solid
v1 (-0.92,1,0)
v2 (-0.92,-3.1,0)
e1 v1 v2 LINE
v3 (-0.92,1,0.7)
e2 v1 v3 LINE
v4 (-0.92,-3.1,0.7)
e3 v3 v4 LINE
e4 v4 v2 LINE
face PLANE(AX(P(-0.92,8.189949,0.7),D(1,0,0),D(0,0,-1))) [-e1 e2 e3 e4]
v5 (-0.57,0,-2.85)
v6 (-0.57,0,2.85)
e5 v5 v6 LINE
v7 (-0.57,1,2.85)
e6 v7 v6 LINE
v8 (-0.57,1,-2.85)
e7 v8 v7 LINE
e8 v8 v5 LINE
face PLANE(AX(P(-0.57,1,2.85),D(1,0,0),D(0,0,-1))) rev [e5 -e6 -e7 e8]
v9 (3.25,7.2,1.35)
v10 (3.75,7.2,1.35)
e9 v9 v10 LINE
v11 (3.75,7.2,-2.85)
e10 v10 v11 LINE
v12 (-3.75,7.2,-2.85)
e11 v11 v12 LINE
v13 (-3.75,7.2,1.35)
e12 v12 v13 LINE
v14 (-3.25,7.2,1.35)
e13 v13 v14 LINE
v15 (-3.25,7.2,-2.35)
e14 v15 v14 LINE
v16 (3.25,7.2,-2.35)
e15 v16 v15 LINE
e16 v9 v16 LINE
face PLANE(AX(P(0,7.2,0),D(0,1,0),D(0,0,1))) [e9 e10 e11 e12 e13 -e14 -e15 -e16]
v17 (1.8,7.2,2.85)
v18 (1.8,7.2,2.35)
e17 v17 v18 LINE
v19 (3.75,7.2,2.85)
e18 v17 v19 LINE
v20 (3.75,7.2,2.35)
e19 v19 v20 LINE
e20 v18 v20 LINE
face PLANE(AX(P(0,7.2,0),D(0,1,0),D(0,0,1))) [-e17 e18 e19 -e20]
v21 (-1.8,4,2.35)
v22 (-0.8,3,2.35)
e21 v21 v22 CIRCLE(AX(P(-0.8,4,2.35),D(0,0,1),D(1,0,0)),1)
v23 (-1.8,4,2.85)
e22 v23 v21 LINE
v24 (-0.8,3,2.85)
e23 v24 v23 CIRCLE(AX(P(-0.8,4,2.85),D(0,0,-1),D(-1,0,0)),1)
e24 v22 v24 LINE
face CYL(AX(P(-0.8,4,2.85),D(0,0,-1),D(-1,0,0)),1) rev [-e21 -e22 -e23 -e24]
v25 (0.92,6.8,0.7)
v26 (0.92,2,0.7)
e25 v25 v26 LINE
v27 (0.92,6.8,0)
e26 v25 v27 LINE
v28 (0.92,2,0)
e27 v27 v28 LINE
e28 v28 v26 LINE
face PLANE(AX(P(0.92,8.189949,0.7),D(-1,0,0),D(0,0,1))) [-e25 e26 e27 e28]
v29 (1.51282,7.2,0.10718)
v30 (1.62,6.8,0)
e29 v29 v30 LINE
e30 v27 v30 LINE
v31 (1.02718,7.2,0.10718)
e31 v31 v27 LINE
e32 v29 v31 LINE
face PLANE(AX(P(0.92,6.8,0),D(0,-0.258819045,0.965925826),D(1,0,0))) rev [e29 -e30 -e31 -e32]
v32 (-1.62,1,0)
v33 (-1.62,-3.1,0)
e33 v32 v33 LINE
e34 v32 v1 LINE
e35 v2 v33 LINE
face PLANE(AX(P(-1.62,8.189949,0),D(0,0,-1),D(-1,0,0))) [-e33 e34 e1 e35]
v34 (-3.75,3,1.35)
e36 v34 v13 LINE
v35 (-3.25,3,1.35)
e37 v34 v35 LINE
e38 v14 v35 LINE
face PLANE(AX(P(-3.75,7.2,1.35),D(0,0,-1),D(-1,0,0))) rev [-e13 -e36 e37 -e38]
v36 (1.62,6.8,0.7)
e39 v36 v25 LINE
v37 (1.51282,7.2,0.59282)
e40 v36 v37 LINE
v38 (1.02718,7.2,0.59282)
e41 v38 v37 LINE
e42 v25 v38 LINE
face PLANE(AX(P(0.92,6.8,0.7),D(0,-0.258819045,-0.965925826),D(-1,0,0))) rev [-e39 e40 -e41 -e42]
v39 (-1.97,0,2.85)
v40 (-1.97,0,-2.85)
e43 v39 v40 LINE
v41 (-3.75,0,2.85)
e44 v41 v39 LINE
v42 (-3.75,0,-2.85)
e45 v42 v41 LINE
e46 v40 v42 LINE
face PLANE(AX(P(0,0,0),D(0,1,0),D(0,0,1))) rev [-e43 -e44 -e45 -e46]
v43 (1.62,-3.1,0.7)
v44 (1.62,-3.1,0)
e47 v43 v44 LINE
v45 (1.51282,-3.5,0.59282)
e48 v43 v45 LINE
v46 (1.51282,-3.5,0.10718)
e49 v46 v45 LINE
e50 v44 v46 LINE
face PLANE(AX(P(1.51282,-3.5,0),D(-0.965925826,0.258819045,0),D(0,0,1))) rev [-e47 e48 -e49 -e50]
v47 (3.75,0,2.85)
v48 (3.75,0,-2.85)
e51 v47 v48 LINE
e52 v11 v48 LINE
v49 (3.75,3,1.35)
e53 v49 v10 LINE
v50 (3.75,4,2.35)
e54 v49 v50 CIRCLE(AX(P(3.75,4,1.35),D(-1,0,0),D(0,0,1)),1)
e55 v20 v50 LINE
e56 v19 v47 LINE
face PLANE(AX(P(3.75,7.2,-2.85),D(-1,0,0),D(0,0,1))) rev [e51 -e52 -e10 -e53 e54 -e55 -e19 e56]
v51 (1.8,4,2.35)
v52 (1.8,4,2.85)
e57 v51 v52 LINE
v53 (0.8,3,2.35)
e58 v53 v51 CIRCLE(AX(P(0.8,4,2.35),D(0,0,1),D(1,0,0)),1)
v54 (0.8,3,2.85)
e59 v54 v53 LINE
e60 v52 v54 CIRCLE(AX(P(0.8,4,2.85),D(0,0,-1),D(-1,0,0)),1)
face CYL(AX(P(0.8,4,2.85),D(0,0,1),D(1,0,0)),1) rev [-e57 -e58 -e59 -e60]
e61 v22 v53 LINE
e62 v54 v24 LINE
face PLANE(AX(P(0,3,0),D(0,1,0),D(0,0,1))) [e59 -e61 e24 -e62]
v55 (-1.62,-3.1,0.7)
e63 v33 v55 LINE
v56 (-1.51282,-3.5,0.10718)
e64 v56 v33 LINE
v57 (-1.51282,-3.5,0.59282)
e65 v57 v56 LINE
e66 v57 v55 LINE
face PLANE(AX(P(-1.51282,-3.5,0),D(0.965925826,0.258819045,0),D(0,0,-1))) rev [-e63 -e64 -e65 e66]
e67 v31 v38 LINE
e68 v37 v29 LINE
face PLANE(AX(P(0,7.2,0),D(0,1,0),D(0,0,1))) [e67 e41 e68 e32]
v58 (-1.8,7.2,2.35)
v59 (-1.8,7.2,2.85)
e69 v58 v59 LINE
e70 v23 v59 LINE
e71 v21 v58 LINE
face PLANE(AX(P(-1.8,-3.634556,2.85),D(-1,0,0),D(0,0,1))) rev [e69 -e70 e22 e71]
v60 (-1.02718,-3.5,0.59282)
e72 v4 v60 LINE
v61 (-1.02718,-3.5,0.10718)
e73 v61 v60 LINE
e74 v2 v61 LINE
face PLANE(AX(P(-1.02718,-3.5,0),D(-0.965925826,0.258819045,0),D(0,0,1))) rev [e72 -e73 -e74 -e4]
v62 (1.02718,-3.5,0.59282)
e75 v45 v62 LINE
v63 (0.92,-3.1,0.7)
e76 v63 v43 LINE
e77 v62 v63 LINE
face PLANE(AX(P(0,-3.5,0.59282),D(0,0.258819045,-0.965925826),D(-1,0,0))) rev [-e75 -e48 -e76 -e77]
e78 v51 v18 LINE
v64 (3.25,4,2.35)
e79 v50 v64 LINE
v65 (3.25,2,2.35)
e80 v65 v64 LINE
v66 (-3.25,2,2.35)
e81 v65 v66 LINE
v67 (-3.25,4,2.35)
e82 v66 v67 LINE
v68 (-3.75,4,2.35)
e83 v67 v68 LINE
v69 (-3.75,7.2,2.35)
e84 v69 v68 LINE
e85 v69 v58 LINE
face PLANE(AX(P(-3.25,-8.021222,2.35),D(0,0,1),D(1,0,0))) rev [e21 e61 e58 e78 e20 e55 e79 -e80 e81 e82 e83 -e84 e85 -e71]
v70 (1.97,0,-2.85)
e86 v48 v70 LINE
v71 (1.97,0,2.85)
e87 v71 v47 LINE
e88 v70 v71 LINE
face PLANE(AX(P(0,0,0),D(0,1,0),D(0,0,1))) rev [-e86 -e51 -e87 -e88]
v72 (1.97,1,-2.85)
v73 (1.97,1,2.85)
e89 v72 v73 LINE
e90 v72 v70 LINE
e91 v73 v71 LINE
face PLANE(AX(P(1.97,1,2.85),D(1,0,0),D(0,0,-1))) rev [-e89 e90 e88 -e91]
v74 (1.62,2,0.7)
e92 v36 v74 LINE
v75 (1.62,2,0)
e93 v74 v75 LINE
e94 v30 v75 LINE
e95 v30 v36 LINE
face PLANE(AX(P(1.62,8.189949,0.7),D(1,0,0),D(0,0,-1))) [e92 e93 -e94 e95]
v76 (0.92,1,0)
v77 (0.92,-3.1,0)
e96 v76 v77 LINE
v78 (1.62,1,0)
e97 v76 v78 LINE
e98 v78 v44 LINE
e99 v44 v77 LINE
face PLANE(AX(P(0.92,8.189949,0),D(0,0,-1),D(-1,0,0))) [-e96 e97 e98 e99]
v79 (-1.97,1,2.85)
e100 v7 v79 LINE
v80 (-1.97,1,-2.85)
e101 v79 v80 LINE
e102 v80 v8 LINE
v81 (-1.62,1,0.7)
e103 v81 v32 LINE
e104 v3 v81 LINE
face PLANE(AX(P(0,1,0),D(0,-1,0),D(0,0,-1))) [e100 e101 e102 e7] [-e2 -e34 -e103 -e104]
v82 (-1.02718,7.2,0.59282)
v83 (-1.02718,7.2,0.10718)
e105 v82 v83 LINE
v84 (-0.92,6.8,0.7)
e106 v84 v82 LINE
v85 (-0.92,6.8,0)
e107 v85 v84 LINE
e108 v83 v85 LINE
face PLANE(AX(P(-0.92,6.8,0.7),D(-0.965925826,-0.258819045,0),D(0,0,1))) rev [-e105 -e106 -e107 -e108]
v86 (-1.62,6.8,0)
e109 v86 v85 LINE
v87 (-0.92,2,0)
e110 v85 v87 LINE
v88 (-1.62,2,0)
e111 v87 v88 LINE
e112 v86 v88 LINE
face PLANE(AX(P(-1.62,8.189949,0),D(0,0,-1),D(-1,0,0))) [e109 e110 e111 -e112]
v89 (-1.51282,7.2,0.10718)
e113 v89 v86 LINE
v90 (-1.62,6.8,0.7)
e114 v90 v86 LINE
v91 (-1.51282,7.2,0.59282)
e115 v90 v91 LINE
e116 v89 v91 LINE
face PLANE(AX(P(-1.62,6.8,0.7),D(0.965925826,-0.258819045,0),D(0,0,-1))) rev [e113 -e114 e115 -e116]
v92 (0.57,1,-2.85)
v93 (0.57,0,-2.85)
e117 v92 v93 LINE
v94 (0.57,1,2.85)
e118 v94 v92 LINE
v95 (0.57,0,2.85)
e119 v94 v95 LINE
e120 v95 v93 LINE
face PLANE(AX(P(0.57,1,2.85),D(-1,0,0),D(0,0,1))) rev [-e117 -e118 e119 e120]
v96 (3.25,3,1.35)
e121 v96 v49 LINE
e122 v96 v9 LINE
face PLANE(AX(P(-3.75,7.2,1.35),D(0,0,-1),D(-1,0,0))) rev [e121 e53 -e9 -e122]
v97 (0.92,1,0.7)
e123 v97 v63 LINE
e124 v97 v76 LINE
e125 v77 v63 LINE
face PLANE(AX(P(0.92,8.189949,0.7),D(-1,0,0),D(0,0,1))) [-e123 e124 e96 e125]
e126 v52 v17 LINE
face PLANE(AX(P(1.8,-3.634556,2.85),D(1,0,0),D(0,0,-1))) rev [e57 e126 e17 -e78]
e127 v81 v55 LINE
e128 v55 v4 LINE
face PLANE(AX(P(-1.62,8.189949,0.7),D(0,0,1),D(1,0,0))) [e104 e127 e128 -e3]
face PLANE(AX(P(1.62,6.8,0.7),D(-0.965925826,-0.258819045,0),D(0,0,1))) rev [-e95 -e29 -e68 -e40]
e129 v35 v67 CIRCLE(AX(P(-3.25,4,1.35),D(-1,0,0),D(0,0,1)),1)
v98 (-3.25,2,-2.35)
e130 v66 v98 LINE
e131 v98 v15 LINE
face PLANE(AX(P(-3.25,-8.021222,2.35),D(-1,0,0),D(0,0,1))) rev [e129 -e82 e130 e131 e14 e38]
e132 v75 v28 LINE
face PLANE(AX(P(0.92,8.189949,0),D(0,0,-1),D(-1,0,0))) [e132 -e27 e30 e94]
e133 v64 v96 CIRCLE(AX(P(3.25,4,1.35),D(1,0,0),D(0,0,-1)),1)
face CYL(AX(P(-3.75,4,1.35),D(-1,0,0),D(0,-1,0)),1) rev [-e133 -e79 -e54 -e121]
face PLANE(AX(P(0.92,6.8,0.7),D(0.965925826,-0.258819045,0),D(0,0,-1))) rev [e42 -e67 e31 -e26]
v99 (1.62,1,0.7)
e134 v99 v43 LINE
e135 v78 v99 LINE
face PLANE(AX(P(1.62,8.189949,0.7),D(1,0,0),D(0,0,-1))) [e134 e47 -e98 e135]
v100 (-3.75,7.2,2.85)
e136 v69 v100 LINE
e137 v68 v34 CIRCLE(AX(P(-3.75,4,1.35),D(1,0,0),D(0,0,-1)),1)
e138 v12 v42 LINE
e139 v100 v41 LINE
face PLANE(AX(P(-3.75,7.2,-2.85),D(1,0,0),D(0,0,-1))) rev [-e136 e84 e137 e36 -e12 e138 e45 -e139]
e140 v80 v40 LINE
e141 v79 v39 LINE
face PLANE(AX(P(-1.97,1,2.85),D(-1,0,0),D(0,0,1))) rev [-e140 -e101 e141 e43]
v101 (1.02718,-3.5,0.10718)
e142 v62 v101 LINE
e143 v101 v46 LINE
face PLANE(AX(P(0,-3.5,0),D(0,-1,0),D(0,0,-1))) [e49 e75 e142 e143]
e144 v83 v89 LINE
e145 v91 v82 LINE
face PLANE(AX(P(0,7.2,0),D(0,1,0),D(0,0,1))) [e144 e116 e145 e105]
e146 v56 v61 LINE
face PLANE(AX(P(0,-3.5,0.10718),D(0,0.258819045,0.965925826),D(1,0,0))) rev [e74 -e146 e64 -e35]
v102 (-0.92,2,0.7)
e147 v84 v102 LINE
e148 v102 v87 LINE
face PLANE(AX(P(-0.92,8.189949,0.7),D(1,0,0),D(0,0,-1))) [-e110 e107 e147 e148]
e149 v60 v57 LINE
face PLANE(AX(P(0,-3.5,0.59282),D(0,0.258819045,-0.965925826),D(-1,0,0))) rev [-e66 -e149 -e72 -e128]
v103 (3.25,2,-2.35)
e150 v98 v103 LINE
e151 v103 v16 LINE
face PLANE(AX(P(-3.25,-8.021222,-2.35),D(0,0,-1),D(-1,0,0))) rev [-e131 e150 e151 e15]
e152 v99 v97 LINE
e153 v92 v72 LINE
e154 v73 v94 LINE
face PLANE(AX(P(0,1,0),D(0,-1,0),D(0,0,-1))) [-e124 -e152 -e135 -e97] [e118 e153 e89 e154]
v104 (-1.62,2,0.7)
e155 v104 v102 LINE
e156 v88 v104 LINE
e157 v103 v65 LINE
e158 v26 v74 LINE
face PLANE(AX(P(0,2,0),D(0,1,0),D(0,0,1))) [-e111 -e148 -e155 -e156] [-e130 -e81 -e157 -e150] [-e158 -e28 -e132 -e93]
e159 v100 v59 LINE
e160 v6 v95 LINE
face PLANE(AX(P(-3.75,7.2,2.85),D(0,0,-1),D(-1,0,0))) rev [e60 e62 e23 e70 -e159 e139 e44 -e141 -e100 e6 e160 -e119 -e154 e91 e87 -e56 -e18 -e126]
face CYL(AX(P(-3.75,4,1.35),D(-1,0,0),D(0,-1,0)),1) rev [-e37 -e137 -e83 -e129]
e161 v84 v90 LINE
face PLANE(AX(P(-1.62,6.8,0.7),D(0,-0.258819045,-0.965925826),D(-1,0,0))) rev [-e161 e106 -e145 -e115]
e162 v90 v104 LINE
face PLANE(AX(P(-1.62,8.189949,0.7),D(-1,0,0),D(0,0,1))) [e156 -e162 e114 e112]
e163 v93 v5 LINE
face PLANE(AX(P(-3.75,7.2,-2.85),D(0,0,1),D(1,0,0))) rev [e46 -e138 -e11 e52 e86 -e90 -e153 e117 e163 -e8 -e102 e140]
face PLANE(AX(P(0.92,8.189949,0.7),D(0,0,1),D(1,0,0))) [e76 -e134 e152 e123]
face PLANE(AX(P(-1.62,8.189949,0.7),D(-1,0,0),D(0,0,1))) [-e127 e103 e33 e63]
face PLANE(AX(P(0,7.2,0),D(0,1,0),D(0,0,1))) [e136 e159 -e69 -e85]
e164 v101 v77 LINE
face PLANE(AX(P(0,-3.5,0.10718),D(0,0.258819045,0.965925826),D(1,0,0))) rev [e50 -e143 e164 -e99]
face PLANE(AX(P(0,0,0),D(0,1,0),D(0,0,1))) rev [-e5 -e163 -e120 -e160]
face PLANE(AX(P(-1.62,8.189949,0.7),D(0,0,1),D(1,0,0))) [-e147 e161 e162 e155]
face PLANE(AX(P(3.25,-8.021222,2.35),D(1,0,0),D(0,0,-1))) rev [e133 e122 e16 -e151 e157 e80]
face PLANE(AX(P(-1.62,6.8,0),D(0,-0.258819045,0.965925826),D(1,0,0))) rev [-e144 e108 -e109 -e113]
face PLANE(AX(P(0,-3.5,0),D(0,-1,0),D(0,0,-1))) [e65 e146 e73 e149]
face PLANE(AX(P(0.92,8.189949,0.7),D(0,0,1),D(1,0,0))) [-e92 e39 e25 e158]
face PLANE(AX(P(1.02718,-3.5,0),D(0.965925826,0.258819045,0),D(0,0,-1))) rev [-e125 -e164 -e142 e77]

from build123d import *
from OCP.BRepFilletAPI import BRepFilletAPI_MakeChamfer

# Parameters (mm, degrees)
CROQUIS2_W              = 7.5
CROQUIS2_H              = 5.7
SALIENTE_EXTRUIR1_DEPTH = 7.2
CROQUIS3_W              = 6.5
CROQUIS3_H              = 4.7
CORTAR_EXTRUIR1_DEPTH   = 5.2
CROQUIS4_W              = 3.6
CROQUIS4_H              = 0.5
CORTAR_EXTRUIR2_DEPTH   = 4.2
CROQUIS5_W              = 1
CROQUIS5_H              = 4.2
CORTAR_EXTRUIR3_DEPTH   = 11.780190165
REDONDEO1_R             = 1
CROQUIS7_W              = 1.4
CROQUIS7_H              = 5.7
CORTAR_EXTRUIR4_DEPTH   = 1
SALIENTE_EXTRUIR2_START = -7.2
CROQUIS6_W              = 0.7
CROQUIS6_H              = 0.7
SALIENTE_EXTRUIR2_DEPTH = 10.7
CHAFL_N1_SIZE           = 0.4
CHAFL_N1_SIZE2          = 0.107179677
CHAFL_N2_SIZE           = 0.4
CHAFL_N2_SIZE2          = 0.107179677
CHAFL_N3_SIZE           = 0.4
CHAFL_N3_SIZE2          = 0.107179677


with BuildPart() as part:
    # Croquis2 → Saliente-Extruir1 (new body)
    with BuildSketch(Plane(origin=(0, 0, 0), x_dir=(1, 0, 0), z_dir=(0, 1, 0))):
        Rectangle(CROQUIS2_W, CROQUIS2_H)
    extrude(amount=SALIENTE_EXTRUIR1_DEPTH)

    # Croquis3 → Cortar-Extruir1 (cut)
    with BuildSketch(Plane(origin=(0, 7.2, 0), x_dir=(1, 0, 0), z_dir=(0, 1, 0))):
        Rectangle(CROQUIS3_W, CROQUIS3_H)
    extrude(amount=-CORTAR_EXTRUIR1_DEPTH, mode=Mode.SUBTRACT)

    # Croquis4 → Cortar-Extruir2 (cut)
    with BuildSketch(Plane(origin=(0, 7.2, 0), x_dir=(1, 0, 0), z_dir=(0, 1, 0))):
        with Locations((0, -2.6)):
            Rectangle(CROQUIS4_W, CROQUIS4_H)
    extrude(amount=-CORTAR_EXTRUIR2_DEPTH, mode=Mode.SUBTRACT)

    # Croquis5 → Cortar-Extruir3 (cut, through all)
    with BuildSketch(Plane(origin=(3.75, 0, 0), x_dir=(0, 0, -1), z_dir=(1, 0, 0))):
        with Locations((-1.85, 5.1)):
            Rectangle(CROQUIS5_W, CROQUIS5_H)
    extrude(amount=-CORTAR_EXTRUIR3_DEPTH, mode=Mode.SUBTRACT)

    # Redondeo1
    # the kernel refuses this fillet: 1 mm, written as the material it adds along each edge
    with BuildSketch(Plane(origin=(1.8, 3, 2.85), x_dir=(0, 1, 0), z_dir=(0, 0, -1)), Plane(origin=(3.75, 3, 2.35), x_dir=(0, 0, -1), z_dir=(-1, 0, 0))) as redondeo1_piece_1:
        with BuildLine():
            CenterArc((REDONDEO1_R, -REDONDEO1_R), REDONDEO1_R, 90, 90)
            Line((0, -REDONDEO1_R), (0, 0))
            Line((0, 0), (REDONDEO1_R, 0))
        make_face()
    extrude(amount=0.5)
    with BuildSketch(Plane(origin=(-1.8, 3, 2.35), x_dir=(1, 0, 0), z_dir=(0, 0, 1)), Plane(origin=(-3.25, 3, 2.35), x_dir=(0, 1, 0), z_dir=(-1, 0, 0))) as redondeo1_piece_2:
        with BuildLine():
            CenterArc((REDONDEO1_R, REDONDEO1_R), REDONDEO1_R, 180, 90)
            Line((0, REDONDEO1_R), (0, 0))
            Line((0, 0), (REDONDEO1_R, 0))
        make_face()
    extrude(amount=0.5)

    # Croquis7 → Cortar-Extruir4 (cut)
    with BuildSketch(Plane.XZ):
        with Locations((-1.27, 0)):
            Rectangle(CROQUIS7_W, CROQUIS7_H)
        with Locations((1.27, 0)):
            Rectangle(CROQUIS7_W, CROQUIS7_H)
    extrude(amount=-CORTAR_EXTRUIR4_DEPTH, mode=Mode.SUBTRACT)

    # Croquis6 → Saliente-Extruir2 (add)
    with BuildSketch(Plane.XZ.offset(SALIENTE_EXTRUIR2_START)):
        with Locations((-1.27, 0.35)):
            Rectangle(CROQUIS6_W, CROQUIS6_H)
        with Locations((1.27, 0.35)):
            Rectangle(CROQUIS6_W, CROQUIS6_H)
    extrude(amount=SALIENTE_EXTRUIR2_DEPTH)

    # Chaflán1: one chamfer whose edges measure the first distance from different faces: ONE call of the kernel's chamfer builder (chamfer() names one face for all edges)
    chafl_n1_edges_1 = [part.edges().sort_by_distance(p)[0] for p in [
        (-0.92, -3.5, 0.35),
    ]]
    chafl_n1_side_1 = [part.faces().sort_by_distance(p)[0] for p in [
        (-0.92, -1.25, 0.35),
    ]]
    chafl_n1_edges_2 = [part.edges().sort_by_distance(p)[0] for p in [
        (-1.27, -3.5, 0.7),
    ]]
    chafl_n1_side_2 = [part.faces().sort_by_distance(p)[0] for p in [
        (-1.27, -1.25, 0.7),
    ]]
    chafl_n1_edges_3 = [part.edges().sort_by_distance(p)[0] for p in [
        (-1.62, -3.5, 0.35),
    ]]
    chafl_n1_side_3 = [part.faces().sort_by_distance(p)[0] for p in [
        (-1.62, -1.25, 0.35),
    ]]
    chafl_n1_edges_4 = [part.edges().sort_by_distance(p)[0] for p in [
        (-1.27, -3.5, 0),
    ]]
    chafl_n1_side_4 = [part.faces().sort_by_distance(p)[0] for p in [
        (-1.27, -1.25, 0),
    ]]
    chafl_n1_edges_5 = [part.edges().sort_by_distance(p)[0] for p in [
        (1.62, -3.5, 0.35),
    ]]
    chafl_n1_side_5 = [part.faces().sort_by_distance(p)[0] for p in [
        (1.62, -1.25, 0.35),
    ]]
    chafl_n1_edges_6 = [part.edges().sort_by_distance(p)[0] for p in [
        (1.27, -3.5, 0.7),
    ]]
    chafl_n1_side_6 = [part.faces().sort_by_distance(p)[0] for p in [
        (1.27, -1.25, 0.7),
    ]]
    chafl_n1_edges_7 = [part.edges().sort_by_distance(p)[0] for p in [
        (0.92, -3.5, 0.35),
    ]]
    chafl_n1_side_7 = [part.faces().sort_by_distance(p)[0] for p in [
        (0.92, -1.25, 0.35),
    ]]
    chafl_n1_edges_8 = [part.edges().sort_by_distance(p)[0] for p in [
        (1.27, -3.5, 0),
    ]]
    chafl_n1_side_8 = [part.faces().sort_by_distance(p)[0] for p in [
        (1.27, -1.25, 0),
    ]]
    chafl_n1 = BRepFilletAPI_MakeChamfer(part.part.solid().wrapped)
    for e in chafl_n1_edges_1:
        chafl_n1.Add(CHAFL_N1_SIZE, CHAFL_N1_SIZE2, e.wrapped, chafl_n1_side_1[0].wrapped)  # the first distance lies on this face
    for e in chafl_n1_edges_2:
        chafl_n1.Add(CHAFL_N1_SIZE, CHAFL_N1_SIZE2, e.wrapped, chafl_n1_side_2[0].wrapped)  # the first distance lies on this face
    for e in chafl_n1_edges_3:
        chafl_n1.Add(CHAFL_N1_SIZE, CHAFL_N1_SIZE2, e.wrapped, chafl_n1_side_3[0].wrapped)  # the first distance lies on this face
    for e in chafl_n1_edges_4:
        chafl_n1.Add(CHAFL_N1_SIZE, CHAFL_N1_SIZE2, e.wrapped, chafl_n1_side_4[0].wrapped)  # the first distance lies on this face
    for e in chafl_n1_edges_5:
        chafl_n1.Add(CHAFL_N1_SIZE, CHAFL_N1_SIZE2, e.wrapped, chafl_n1_side_5[0].wrapped)  # the first distance lies on this face
    for e in chafl_n1_edges_6:
        chafl_n1.Add(CHAFL_N1_SIZE, CHAFL_N1_SIZE2, e.wrapped, chafl_n1_side_6[0].wrapped)  # the first distance lies on this face
    for e in chafl_n1_edges_7:
        chafl_n1.Add(CHAFL_N1_SIZE, CHAFL_N1_SIZE2, e.wrapped, chafl_n1_side_7[0].wrapped)  # the first distance lies on this face
    for e in chafl_n1_edges_8:
        chafl_n1.Add(CHAFL_N1_SIZE, CHAFL_N1_SIZE2, e.wrapped, chafl_n1_side_8[0].wrapped)  # the first distance lies on this face
    add(Compound.cast(chafl_n1.Shape()), mode=Mode.REPLACE)

    # Chaflán2: one chamfer whose edges measure the first distance from different faces: ONE call of the kernel's chamfer builder (chamfer() names one face for all edges)
    chafl_n2_edges_1 = [part.edges().sort_by_distance(p)[0] for p in [
        (-1.27, 7.2, 0.7),
    ]]
    chafl_n2_side_1 = [part.faces().sort_by_distance(p)[0] for p in [
        (-1.27, 4.6, 0.7),
    ]]
    chafl_n2_edges_2 = [part.edges().sort_by_distance(p)[0] for p in [
        (-1.62, 7.2, 0.35),
    ]]
    chafl_n2_side_2 = [part.faces().sort_by_distance(p)[0] for p in [
        (-1.62, 4.6, 0.35),
    ]]
    chafl_n2_edges_3 = [part.edges().sort_by_distance(p)[0] for p in [
        (-1.27, 7.2, 0),
    ]]
    chafl_n2_side_3 = [part.faces().sort_by_distance(p)[0] for p in [
        (-1.27, 4.6, 0),
    ]]
    chafl_n2_edges_4 = [part.edges().sort_by_distance(p)[0] for p in [
        (-0.92, 7.2, 0.35),
    ]]
    chafl_n2_side_4 = [part.faces().sort_by_distance(p)[0] for p in [
        (-0.92, 4.6, 0.35),
    ]]
    chafl_n2 = BRepFilletAPI_MakeChamfer(part.part.solid().wrapped)
    for e in chafl_n2_edges_1:
        chafl_n2.Add(CHAFL_N2_SIZE, CHAFL_N2_SIZE2, e.wrapped, chafl_n2_side_1[0].wrapped)  # the first distance lies on this face
    for e in chafl_n2_edges_2:
        chafl_n2.Add(CHAFL_N2_SIZE, CHAFL_N2_SIZE2, e.wrapped, chafl_n2_side_2[0].wrapped)  # the first distance lies on this face
    for e in chafl_n2_edges_3:
        chafl_n2.Add(CHAFL_N2_SIZE, CHAFL_N2_SIZE2, e.wrapped, chafl_n2_side_3[0].wrapped)  # the first distance lies on this face
    for e in chafl_n2_edges_4:
        chafl_n2.Add(CHAFL_N2_SIZE, CHAFL_N2_SIZE2, e.wrapped, chafl_n2_side_4[0].wrapped)  # the first distance lies on this face
    add(Compound.cast(chafl_n2.Shape()), mode=Mode.REPLACE)

    # Chaflán3: one chamfer whose edges measure the first distance from different faces: ONE call of the kernel's chamfer builder (chamfer() names one face for all edges)
    chafl_n3_edges_1 = [part.edges().sort_by_distance(p)[0] for p in [
        (1.27, 7.2, 0.7),
    ]]
    chafl_n3_side_1 = [part.faces().sort_by_distance(p)[0] for p in [
        (1.27, 4.6, 0.7),
    ]]
    chafl_n3_edges_2 = [part.edges().sort_by_distance(p)[0] for p in [
        (0.92, 7.2, 0.35),
    ]]
    chafl_n3_side_2 = [part.faces().sort_by_distance(p)[0] for p in [
        (0.92, 4.6, 0.35),
    ]]
    chafl_n3_edges_3 = [part.edges().sort_by_distance(p)[0] for p in [
        (1.27, 7.2, 0),
    ]]
    chafl_n3_side_3 = [part.faces().sort_by_distance(p)[0] for p in [
        (1.27, 4.6, 0),
    ]]
    chafl_n3_edges_4 = [part.edges().sort_by_distance(p)[0] for p in [
        (1.62, 7.2, 0.35),
    ]]
    chafl_n3_side_4 = [part.faces().sort_by_distance(p)[0] for p in [
        (1.62, 4.6, 0.35),
    ]]
    chafl_n3 = BRepFilletAPI_MakeChamfer(part.part.solid().wrapped)
    for e in chafl_n3_edges_1:
        chafl_n3.Add(CHAFL_N3_SIZE, CHAFL_N3_SIZE2, e.wrapped, chafl_n3_side_1[0].wrapped)  # the first distance lies on this face
    for e in chafl_n3_edges_2:
        chafl_n3.Add(CHAFL_N3_SIZE, CHAFL_N3_SIZE2, e.wrapped, chafl_n3_side_2[0].wrapped)  # the first distance lies on this face
    for e in chafl_n3_edges_3:
        chafl_n3.Add(CHAFL_N3_SIZE, CHAFL_N3_SIZE2, e.wrapped, chafl_n3_side_3[0].wrapped)  # the first distance lies on this face
    for e in chafl_n3_edges_4:
        chafl_n3.Add(CHAFL_N3_SIZE, CHAFL_N3_SIZE2, e.wrapped, chafl_n3_side_4[0].wrapped)  # the first distance lies on this face
    add(Compound.cast(chafl_n3.Shape()), mode=Mode.REPLACE)


solid = part.part
